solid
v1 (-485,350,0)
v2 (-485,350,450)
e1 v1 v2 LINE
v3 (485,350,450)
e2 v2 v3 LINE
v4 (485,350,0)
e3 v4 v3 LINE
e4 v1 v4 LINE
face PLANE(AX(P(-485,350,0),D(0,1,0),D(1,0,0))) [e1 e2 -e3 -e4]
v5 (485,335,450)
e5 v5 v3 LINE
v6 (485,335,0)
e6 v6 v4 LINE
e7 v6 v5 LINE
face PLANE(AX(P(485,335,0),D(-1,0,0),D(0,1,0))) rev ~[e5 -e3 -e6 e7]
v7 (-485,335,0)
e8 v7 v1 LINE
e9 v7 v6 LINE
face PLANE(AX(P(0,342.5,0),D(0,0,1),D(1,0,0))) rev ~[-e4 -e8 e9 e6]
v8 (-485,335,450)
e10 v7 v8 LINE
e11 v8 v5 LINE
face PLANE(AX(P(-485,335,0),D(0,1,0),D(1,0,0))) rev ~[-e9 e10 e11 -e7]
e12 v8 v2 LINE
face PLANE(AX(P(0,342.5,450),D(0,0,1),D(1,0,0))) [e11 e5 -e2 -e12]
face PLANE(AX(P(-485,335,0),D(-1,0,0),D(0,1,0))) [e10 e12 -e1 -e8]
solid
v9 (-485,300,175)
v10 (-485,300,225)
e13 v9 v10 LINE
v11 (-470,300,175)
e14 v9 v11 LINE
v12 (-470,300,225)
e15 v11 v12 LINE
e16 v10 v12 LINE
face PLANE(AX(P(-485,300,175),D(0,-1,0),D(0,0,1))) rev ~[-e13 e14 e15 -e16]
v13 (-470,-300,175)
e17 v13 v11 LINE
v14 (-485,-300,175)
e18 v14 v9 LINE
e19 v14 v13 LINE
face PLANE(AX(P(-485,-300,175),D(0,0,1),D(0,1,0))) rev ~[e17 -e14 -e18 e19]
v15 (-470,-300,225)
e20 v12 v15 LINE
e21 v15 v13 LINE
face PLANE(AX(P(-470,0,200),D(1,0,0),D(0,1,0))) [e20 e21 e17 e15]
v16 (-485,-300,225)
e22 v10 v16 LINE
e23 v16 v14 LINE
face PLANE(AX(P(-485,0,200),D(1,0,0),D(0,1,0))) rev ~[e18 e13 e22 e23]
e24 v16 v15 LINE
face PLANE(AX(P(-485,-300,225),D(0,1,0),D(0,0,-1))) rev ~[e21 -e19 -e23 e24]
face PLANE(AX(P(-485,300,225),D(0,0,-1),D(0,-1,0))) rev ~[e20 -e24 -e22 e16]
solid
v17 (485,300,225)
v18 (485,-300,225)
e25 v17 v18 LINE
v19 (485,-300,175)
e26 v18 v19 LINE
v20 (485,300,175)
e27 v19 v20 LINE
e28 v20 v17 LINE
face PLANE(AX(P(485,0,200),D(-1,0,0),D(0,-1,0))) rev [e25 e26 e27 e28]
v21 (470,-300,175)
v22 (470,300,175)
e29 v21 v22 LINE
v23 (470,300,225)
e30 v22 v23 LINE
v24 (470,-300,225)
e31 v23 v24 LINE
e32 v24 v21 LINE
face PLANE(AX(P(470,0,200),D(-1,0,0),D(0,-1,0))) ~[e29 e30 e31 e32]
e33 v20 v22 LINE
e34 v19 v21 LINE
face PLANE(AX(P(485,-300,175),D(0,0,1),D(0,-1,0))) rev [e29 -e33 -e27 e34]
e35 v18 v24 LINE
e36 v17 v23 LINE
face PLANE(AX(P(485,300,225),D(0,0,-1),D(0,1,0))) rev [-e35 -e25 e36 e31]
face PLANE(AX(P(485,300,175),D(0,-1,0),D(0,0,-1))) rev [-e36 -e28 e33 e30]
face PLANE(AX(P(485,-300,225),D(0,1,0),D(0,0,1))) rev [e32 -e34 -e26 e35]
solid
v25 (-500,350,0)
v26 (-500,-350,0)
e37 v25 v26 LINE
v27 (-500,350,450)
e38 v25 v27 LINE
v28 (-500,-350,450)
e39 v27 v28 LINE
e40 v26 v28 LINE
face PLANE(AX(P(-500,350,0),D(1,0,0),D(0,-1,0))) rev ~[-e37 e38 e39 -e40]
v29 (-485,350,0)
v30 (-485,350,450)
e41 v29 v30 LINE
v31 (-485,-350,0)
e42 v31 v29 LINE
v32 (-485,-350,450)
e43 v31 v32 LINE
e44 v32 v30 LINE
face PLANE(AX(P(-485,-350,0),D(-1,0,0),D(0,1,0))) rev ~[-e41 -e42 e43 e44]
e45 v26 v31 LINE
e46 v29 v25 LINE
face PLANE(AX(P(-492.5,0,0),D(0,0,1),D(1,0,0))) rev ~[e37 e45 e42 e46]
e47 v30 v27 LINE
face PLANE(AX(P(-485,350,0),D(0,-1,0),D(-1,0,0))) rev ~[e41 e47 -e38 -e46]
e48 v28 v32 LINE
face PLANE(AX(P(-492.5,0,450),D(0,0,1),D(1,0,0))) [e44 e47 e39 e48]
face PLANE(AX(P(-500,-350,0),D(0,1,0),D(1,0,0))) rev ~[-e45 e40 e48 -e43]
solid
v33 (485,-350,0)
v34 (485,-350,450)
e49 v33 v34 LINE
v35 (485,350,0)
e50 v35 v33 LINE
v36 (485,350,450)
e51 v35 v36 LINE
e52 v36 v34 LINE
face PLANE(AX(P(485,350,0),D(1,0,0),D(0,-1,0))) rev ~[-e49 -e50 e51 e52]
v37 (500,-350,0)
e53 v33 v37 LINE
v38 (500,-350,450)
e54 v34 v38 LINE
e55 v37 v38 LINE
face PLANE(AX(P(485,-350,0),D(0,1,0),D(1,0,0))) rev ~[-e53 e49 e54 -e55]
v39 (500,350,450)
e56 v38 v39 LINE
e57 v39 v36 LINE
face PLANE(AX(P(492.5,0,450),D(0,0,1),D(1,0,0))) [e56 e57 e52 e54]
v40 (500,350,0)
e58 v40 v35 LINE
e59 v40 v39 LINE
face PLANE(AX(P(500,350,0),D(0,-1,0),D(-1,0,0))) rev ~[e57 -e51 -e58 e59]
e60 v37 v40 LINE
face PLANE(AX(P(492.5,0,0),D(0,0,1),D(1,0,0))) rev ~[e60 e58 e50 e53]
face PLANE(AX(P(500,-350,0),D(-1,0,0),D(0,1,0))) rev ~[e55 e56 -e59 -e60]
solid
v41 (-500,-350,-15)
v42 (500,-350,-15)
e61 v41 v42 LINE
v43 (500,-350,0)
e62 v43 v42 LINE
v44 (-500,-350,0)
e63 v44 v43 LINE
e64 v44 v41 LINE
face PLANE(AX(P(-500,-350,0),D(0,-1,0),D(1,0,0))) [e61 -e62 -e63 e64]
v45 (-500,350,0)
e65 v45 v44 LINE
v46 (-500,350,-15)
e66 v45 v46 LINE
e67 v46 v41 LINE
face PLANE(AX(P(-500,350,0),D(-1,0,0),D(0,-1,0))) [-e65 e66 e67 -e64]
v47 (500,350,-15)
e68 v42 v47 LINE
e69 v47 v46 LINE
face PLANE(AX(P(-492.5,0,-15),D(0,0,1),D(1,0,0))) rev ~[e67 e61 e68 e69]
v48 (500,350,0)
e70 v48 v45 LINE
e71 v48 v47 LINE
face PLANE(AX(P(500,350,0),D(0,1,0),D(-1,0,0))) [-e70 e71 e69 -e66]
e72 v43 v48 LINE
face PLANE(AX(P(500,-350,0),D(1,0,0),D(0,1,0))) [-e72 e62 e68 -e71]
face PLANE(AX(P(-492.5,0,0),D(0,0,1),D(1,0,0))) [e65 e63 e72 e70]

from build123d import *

# Parameters (mm, degrees)
F1_DEPTH = 450
F0_W     = 970
F0_H     = 15
F2_DEPTH = 450
F3_DEPTH = 450
F0_H_2   = 685
F4_DEPTH = 15
F5_DEPTH = 450
F7_DEPTH = 15
F9_DEPTH = 450


# Not quite as in the source:
# - a feature names something its author has since deleted; it is built from what else it names


with BuildPart() as f1:
    # F0 (on Top) → F1 (new body)
    with BuildSketch(Plane.XY):
        Polygon((-500, -350), (-485, -350), (-485, 335), (-485, 350), (-500, 350), align=None)
    extrude(amount=F1_DEPTH)


with BuildPart() as f2:
    # F0 (on Top) → F2 (new body)
    with BuildSketch(Plane.XY):
        with Locations((0, 342.5)):
            Rectangle(F0_W, F0_H)
    extrude(amount=F2_DEPTH)


with BuildPart() as f3:
    # F0 (on Top) → F3 (new body)
    with BuildSketch(Plane.XY):
        Polygon((485, -350), (500, -350), (500, 350), (485, 350), (485, 335), align=None)
    extrude(amount=F3_DEPTH)


with BuildPart() as f4:
    # F0 (on Top) → F4 (new body)
    with BuildSketch(Plane.XY):
        Polygon((-500, -350), (-485, -350), (-485, 335), (-485, 350), (-500, 350), align=None)
        with Locations((0, -7.5)):
            Rectangle(F0_W, F0_H_2)
        with Locations((0, 342.5)):
            Rectangle(F0_W, F0_H)
        Polygon((485, -350), (500, -350), (500, 350), (485, 350), (485, 335), align=None)
    extrude(amount=-F4_DEPTH)


with BuildPart() as f5:
    # F0 (on Top) → F5 (new body)
    with BuildSketch(Plane.XY):
        with Locations((0, 342.5)):
            Rectangle(F0_W, F0_H)
    extrude(amount=F5_DEPTH)


with BuildPart() as f7:
    # F6 (on face) → F7 (new body)
    with BuildSketch(Plane.YZ.offset(-485)):
        Polygon((-300, 175), (0, 175), (300, 175), (300, 225), (-300, 225), align=None)
    extrude(amount=F7_DEPTH)


with BuildPart() as f8_1:
    # F8: instance of F7
    add(f7.part.mirror(Plane.YZ))


with BuildPart() as f9:
    # F0 (on Top) → F9 (new body)
    with BuildSketch(Plane.XY):
        Polygon((-500, -350), (-485, -350), (-485, 335), (-485, 350), (-500, 350), align=None)
    extrude(amount=F9_DEPTH)


solid = Compound([f3.part, f4.part, f5.part, f7.part, f8_1.part, f9.part])
